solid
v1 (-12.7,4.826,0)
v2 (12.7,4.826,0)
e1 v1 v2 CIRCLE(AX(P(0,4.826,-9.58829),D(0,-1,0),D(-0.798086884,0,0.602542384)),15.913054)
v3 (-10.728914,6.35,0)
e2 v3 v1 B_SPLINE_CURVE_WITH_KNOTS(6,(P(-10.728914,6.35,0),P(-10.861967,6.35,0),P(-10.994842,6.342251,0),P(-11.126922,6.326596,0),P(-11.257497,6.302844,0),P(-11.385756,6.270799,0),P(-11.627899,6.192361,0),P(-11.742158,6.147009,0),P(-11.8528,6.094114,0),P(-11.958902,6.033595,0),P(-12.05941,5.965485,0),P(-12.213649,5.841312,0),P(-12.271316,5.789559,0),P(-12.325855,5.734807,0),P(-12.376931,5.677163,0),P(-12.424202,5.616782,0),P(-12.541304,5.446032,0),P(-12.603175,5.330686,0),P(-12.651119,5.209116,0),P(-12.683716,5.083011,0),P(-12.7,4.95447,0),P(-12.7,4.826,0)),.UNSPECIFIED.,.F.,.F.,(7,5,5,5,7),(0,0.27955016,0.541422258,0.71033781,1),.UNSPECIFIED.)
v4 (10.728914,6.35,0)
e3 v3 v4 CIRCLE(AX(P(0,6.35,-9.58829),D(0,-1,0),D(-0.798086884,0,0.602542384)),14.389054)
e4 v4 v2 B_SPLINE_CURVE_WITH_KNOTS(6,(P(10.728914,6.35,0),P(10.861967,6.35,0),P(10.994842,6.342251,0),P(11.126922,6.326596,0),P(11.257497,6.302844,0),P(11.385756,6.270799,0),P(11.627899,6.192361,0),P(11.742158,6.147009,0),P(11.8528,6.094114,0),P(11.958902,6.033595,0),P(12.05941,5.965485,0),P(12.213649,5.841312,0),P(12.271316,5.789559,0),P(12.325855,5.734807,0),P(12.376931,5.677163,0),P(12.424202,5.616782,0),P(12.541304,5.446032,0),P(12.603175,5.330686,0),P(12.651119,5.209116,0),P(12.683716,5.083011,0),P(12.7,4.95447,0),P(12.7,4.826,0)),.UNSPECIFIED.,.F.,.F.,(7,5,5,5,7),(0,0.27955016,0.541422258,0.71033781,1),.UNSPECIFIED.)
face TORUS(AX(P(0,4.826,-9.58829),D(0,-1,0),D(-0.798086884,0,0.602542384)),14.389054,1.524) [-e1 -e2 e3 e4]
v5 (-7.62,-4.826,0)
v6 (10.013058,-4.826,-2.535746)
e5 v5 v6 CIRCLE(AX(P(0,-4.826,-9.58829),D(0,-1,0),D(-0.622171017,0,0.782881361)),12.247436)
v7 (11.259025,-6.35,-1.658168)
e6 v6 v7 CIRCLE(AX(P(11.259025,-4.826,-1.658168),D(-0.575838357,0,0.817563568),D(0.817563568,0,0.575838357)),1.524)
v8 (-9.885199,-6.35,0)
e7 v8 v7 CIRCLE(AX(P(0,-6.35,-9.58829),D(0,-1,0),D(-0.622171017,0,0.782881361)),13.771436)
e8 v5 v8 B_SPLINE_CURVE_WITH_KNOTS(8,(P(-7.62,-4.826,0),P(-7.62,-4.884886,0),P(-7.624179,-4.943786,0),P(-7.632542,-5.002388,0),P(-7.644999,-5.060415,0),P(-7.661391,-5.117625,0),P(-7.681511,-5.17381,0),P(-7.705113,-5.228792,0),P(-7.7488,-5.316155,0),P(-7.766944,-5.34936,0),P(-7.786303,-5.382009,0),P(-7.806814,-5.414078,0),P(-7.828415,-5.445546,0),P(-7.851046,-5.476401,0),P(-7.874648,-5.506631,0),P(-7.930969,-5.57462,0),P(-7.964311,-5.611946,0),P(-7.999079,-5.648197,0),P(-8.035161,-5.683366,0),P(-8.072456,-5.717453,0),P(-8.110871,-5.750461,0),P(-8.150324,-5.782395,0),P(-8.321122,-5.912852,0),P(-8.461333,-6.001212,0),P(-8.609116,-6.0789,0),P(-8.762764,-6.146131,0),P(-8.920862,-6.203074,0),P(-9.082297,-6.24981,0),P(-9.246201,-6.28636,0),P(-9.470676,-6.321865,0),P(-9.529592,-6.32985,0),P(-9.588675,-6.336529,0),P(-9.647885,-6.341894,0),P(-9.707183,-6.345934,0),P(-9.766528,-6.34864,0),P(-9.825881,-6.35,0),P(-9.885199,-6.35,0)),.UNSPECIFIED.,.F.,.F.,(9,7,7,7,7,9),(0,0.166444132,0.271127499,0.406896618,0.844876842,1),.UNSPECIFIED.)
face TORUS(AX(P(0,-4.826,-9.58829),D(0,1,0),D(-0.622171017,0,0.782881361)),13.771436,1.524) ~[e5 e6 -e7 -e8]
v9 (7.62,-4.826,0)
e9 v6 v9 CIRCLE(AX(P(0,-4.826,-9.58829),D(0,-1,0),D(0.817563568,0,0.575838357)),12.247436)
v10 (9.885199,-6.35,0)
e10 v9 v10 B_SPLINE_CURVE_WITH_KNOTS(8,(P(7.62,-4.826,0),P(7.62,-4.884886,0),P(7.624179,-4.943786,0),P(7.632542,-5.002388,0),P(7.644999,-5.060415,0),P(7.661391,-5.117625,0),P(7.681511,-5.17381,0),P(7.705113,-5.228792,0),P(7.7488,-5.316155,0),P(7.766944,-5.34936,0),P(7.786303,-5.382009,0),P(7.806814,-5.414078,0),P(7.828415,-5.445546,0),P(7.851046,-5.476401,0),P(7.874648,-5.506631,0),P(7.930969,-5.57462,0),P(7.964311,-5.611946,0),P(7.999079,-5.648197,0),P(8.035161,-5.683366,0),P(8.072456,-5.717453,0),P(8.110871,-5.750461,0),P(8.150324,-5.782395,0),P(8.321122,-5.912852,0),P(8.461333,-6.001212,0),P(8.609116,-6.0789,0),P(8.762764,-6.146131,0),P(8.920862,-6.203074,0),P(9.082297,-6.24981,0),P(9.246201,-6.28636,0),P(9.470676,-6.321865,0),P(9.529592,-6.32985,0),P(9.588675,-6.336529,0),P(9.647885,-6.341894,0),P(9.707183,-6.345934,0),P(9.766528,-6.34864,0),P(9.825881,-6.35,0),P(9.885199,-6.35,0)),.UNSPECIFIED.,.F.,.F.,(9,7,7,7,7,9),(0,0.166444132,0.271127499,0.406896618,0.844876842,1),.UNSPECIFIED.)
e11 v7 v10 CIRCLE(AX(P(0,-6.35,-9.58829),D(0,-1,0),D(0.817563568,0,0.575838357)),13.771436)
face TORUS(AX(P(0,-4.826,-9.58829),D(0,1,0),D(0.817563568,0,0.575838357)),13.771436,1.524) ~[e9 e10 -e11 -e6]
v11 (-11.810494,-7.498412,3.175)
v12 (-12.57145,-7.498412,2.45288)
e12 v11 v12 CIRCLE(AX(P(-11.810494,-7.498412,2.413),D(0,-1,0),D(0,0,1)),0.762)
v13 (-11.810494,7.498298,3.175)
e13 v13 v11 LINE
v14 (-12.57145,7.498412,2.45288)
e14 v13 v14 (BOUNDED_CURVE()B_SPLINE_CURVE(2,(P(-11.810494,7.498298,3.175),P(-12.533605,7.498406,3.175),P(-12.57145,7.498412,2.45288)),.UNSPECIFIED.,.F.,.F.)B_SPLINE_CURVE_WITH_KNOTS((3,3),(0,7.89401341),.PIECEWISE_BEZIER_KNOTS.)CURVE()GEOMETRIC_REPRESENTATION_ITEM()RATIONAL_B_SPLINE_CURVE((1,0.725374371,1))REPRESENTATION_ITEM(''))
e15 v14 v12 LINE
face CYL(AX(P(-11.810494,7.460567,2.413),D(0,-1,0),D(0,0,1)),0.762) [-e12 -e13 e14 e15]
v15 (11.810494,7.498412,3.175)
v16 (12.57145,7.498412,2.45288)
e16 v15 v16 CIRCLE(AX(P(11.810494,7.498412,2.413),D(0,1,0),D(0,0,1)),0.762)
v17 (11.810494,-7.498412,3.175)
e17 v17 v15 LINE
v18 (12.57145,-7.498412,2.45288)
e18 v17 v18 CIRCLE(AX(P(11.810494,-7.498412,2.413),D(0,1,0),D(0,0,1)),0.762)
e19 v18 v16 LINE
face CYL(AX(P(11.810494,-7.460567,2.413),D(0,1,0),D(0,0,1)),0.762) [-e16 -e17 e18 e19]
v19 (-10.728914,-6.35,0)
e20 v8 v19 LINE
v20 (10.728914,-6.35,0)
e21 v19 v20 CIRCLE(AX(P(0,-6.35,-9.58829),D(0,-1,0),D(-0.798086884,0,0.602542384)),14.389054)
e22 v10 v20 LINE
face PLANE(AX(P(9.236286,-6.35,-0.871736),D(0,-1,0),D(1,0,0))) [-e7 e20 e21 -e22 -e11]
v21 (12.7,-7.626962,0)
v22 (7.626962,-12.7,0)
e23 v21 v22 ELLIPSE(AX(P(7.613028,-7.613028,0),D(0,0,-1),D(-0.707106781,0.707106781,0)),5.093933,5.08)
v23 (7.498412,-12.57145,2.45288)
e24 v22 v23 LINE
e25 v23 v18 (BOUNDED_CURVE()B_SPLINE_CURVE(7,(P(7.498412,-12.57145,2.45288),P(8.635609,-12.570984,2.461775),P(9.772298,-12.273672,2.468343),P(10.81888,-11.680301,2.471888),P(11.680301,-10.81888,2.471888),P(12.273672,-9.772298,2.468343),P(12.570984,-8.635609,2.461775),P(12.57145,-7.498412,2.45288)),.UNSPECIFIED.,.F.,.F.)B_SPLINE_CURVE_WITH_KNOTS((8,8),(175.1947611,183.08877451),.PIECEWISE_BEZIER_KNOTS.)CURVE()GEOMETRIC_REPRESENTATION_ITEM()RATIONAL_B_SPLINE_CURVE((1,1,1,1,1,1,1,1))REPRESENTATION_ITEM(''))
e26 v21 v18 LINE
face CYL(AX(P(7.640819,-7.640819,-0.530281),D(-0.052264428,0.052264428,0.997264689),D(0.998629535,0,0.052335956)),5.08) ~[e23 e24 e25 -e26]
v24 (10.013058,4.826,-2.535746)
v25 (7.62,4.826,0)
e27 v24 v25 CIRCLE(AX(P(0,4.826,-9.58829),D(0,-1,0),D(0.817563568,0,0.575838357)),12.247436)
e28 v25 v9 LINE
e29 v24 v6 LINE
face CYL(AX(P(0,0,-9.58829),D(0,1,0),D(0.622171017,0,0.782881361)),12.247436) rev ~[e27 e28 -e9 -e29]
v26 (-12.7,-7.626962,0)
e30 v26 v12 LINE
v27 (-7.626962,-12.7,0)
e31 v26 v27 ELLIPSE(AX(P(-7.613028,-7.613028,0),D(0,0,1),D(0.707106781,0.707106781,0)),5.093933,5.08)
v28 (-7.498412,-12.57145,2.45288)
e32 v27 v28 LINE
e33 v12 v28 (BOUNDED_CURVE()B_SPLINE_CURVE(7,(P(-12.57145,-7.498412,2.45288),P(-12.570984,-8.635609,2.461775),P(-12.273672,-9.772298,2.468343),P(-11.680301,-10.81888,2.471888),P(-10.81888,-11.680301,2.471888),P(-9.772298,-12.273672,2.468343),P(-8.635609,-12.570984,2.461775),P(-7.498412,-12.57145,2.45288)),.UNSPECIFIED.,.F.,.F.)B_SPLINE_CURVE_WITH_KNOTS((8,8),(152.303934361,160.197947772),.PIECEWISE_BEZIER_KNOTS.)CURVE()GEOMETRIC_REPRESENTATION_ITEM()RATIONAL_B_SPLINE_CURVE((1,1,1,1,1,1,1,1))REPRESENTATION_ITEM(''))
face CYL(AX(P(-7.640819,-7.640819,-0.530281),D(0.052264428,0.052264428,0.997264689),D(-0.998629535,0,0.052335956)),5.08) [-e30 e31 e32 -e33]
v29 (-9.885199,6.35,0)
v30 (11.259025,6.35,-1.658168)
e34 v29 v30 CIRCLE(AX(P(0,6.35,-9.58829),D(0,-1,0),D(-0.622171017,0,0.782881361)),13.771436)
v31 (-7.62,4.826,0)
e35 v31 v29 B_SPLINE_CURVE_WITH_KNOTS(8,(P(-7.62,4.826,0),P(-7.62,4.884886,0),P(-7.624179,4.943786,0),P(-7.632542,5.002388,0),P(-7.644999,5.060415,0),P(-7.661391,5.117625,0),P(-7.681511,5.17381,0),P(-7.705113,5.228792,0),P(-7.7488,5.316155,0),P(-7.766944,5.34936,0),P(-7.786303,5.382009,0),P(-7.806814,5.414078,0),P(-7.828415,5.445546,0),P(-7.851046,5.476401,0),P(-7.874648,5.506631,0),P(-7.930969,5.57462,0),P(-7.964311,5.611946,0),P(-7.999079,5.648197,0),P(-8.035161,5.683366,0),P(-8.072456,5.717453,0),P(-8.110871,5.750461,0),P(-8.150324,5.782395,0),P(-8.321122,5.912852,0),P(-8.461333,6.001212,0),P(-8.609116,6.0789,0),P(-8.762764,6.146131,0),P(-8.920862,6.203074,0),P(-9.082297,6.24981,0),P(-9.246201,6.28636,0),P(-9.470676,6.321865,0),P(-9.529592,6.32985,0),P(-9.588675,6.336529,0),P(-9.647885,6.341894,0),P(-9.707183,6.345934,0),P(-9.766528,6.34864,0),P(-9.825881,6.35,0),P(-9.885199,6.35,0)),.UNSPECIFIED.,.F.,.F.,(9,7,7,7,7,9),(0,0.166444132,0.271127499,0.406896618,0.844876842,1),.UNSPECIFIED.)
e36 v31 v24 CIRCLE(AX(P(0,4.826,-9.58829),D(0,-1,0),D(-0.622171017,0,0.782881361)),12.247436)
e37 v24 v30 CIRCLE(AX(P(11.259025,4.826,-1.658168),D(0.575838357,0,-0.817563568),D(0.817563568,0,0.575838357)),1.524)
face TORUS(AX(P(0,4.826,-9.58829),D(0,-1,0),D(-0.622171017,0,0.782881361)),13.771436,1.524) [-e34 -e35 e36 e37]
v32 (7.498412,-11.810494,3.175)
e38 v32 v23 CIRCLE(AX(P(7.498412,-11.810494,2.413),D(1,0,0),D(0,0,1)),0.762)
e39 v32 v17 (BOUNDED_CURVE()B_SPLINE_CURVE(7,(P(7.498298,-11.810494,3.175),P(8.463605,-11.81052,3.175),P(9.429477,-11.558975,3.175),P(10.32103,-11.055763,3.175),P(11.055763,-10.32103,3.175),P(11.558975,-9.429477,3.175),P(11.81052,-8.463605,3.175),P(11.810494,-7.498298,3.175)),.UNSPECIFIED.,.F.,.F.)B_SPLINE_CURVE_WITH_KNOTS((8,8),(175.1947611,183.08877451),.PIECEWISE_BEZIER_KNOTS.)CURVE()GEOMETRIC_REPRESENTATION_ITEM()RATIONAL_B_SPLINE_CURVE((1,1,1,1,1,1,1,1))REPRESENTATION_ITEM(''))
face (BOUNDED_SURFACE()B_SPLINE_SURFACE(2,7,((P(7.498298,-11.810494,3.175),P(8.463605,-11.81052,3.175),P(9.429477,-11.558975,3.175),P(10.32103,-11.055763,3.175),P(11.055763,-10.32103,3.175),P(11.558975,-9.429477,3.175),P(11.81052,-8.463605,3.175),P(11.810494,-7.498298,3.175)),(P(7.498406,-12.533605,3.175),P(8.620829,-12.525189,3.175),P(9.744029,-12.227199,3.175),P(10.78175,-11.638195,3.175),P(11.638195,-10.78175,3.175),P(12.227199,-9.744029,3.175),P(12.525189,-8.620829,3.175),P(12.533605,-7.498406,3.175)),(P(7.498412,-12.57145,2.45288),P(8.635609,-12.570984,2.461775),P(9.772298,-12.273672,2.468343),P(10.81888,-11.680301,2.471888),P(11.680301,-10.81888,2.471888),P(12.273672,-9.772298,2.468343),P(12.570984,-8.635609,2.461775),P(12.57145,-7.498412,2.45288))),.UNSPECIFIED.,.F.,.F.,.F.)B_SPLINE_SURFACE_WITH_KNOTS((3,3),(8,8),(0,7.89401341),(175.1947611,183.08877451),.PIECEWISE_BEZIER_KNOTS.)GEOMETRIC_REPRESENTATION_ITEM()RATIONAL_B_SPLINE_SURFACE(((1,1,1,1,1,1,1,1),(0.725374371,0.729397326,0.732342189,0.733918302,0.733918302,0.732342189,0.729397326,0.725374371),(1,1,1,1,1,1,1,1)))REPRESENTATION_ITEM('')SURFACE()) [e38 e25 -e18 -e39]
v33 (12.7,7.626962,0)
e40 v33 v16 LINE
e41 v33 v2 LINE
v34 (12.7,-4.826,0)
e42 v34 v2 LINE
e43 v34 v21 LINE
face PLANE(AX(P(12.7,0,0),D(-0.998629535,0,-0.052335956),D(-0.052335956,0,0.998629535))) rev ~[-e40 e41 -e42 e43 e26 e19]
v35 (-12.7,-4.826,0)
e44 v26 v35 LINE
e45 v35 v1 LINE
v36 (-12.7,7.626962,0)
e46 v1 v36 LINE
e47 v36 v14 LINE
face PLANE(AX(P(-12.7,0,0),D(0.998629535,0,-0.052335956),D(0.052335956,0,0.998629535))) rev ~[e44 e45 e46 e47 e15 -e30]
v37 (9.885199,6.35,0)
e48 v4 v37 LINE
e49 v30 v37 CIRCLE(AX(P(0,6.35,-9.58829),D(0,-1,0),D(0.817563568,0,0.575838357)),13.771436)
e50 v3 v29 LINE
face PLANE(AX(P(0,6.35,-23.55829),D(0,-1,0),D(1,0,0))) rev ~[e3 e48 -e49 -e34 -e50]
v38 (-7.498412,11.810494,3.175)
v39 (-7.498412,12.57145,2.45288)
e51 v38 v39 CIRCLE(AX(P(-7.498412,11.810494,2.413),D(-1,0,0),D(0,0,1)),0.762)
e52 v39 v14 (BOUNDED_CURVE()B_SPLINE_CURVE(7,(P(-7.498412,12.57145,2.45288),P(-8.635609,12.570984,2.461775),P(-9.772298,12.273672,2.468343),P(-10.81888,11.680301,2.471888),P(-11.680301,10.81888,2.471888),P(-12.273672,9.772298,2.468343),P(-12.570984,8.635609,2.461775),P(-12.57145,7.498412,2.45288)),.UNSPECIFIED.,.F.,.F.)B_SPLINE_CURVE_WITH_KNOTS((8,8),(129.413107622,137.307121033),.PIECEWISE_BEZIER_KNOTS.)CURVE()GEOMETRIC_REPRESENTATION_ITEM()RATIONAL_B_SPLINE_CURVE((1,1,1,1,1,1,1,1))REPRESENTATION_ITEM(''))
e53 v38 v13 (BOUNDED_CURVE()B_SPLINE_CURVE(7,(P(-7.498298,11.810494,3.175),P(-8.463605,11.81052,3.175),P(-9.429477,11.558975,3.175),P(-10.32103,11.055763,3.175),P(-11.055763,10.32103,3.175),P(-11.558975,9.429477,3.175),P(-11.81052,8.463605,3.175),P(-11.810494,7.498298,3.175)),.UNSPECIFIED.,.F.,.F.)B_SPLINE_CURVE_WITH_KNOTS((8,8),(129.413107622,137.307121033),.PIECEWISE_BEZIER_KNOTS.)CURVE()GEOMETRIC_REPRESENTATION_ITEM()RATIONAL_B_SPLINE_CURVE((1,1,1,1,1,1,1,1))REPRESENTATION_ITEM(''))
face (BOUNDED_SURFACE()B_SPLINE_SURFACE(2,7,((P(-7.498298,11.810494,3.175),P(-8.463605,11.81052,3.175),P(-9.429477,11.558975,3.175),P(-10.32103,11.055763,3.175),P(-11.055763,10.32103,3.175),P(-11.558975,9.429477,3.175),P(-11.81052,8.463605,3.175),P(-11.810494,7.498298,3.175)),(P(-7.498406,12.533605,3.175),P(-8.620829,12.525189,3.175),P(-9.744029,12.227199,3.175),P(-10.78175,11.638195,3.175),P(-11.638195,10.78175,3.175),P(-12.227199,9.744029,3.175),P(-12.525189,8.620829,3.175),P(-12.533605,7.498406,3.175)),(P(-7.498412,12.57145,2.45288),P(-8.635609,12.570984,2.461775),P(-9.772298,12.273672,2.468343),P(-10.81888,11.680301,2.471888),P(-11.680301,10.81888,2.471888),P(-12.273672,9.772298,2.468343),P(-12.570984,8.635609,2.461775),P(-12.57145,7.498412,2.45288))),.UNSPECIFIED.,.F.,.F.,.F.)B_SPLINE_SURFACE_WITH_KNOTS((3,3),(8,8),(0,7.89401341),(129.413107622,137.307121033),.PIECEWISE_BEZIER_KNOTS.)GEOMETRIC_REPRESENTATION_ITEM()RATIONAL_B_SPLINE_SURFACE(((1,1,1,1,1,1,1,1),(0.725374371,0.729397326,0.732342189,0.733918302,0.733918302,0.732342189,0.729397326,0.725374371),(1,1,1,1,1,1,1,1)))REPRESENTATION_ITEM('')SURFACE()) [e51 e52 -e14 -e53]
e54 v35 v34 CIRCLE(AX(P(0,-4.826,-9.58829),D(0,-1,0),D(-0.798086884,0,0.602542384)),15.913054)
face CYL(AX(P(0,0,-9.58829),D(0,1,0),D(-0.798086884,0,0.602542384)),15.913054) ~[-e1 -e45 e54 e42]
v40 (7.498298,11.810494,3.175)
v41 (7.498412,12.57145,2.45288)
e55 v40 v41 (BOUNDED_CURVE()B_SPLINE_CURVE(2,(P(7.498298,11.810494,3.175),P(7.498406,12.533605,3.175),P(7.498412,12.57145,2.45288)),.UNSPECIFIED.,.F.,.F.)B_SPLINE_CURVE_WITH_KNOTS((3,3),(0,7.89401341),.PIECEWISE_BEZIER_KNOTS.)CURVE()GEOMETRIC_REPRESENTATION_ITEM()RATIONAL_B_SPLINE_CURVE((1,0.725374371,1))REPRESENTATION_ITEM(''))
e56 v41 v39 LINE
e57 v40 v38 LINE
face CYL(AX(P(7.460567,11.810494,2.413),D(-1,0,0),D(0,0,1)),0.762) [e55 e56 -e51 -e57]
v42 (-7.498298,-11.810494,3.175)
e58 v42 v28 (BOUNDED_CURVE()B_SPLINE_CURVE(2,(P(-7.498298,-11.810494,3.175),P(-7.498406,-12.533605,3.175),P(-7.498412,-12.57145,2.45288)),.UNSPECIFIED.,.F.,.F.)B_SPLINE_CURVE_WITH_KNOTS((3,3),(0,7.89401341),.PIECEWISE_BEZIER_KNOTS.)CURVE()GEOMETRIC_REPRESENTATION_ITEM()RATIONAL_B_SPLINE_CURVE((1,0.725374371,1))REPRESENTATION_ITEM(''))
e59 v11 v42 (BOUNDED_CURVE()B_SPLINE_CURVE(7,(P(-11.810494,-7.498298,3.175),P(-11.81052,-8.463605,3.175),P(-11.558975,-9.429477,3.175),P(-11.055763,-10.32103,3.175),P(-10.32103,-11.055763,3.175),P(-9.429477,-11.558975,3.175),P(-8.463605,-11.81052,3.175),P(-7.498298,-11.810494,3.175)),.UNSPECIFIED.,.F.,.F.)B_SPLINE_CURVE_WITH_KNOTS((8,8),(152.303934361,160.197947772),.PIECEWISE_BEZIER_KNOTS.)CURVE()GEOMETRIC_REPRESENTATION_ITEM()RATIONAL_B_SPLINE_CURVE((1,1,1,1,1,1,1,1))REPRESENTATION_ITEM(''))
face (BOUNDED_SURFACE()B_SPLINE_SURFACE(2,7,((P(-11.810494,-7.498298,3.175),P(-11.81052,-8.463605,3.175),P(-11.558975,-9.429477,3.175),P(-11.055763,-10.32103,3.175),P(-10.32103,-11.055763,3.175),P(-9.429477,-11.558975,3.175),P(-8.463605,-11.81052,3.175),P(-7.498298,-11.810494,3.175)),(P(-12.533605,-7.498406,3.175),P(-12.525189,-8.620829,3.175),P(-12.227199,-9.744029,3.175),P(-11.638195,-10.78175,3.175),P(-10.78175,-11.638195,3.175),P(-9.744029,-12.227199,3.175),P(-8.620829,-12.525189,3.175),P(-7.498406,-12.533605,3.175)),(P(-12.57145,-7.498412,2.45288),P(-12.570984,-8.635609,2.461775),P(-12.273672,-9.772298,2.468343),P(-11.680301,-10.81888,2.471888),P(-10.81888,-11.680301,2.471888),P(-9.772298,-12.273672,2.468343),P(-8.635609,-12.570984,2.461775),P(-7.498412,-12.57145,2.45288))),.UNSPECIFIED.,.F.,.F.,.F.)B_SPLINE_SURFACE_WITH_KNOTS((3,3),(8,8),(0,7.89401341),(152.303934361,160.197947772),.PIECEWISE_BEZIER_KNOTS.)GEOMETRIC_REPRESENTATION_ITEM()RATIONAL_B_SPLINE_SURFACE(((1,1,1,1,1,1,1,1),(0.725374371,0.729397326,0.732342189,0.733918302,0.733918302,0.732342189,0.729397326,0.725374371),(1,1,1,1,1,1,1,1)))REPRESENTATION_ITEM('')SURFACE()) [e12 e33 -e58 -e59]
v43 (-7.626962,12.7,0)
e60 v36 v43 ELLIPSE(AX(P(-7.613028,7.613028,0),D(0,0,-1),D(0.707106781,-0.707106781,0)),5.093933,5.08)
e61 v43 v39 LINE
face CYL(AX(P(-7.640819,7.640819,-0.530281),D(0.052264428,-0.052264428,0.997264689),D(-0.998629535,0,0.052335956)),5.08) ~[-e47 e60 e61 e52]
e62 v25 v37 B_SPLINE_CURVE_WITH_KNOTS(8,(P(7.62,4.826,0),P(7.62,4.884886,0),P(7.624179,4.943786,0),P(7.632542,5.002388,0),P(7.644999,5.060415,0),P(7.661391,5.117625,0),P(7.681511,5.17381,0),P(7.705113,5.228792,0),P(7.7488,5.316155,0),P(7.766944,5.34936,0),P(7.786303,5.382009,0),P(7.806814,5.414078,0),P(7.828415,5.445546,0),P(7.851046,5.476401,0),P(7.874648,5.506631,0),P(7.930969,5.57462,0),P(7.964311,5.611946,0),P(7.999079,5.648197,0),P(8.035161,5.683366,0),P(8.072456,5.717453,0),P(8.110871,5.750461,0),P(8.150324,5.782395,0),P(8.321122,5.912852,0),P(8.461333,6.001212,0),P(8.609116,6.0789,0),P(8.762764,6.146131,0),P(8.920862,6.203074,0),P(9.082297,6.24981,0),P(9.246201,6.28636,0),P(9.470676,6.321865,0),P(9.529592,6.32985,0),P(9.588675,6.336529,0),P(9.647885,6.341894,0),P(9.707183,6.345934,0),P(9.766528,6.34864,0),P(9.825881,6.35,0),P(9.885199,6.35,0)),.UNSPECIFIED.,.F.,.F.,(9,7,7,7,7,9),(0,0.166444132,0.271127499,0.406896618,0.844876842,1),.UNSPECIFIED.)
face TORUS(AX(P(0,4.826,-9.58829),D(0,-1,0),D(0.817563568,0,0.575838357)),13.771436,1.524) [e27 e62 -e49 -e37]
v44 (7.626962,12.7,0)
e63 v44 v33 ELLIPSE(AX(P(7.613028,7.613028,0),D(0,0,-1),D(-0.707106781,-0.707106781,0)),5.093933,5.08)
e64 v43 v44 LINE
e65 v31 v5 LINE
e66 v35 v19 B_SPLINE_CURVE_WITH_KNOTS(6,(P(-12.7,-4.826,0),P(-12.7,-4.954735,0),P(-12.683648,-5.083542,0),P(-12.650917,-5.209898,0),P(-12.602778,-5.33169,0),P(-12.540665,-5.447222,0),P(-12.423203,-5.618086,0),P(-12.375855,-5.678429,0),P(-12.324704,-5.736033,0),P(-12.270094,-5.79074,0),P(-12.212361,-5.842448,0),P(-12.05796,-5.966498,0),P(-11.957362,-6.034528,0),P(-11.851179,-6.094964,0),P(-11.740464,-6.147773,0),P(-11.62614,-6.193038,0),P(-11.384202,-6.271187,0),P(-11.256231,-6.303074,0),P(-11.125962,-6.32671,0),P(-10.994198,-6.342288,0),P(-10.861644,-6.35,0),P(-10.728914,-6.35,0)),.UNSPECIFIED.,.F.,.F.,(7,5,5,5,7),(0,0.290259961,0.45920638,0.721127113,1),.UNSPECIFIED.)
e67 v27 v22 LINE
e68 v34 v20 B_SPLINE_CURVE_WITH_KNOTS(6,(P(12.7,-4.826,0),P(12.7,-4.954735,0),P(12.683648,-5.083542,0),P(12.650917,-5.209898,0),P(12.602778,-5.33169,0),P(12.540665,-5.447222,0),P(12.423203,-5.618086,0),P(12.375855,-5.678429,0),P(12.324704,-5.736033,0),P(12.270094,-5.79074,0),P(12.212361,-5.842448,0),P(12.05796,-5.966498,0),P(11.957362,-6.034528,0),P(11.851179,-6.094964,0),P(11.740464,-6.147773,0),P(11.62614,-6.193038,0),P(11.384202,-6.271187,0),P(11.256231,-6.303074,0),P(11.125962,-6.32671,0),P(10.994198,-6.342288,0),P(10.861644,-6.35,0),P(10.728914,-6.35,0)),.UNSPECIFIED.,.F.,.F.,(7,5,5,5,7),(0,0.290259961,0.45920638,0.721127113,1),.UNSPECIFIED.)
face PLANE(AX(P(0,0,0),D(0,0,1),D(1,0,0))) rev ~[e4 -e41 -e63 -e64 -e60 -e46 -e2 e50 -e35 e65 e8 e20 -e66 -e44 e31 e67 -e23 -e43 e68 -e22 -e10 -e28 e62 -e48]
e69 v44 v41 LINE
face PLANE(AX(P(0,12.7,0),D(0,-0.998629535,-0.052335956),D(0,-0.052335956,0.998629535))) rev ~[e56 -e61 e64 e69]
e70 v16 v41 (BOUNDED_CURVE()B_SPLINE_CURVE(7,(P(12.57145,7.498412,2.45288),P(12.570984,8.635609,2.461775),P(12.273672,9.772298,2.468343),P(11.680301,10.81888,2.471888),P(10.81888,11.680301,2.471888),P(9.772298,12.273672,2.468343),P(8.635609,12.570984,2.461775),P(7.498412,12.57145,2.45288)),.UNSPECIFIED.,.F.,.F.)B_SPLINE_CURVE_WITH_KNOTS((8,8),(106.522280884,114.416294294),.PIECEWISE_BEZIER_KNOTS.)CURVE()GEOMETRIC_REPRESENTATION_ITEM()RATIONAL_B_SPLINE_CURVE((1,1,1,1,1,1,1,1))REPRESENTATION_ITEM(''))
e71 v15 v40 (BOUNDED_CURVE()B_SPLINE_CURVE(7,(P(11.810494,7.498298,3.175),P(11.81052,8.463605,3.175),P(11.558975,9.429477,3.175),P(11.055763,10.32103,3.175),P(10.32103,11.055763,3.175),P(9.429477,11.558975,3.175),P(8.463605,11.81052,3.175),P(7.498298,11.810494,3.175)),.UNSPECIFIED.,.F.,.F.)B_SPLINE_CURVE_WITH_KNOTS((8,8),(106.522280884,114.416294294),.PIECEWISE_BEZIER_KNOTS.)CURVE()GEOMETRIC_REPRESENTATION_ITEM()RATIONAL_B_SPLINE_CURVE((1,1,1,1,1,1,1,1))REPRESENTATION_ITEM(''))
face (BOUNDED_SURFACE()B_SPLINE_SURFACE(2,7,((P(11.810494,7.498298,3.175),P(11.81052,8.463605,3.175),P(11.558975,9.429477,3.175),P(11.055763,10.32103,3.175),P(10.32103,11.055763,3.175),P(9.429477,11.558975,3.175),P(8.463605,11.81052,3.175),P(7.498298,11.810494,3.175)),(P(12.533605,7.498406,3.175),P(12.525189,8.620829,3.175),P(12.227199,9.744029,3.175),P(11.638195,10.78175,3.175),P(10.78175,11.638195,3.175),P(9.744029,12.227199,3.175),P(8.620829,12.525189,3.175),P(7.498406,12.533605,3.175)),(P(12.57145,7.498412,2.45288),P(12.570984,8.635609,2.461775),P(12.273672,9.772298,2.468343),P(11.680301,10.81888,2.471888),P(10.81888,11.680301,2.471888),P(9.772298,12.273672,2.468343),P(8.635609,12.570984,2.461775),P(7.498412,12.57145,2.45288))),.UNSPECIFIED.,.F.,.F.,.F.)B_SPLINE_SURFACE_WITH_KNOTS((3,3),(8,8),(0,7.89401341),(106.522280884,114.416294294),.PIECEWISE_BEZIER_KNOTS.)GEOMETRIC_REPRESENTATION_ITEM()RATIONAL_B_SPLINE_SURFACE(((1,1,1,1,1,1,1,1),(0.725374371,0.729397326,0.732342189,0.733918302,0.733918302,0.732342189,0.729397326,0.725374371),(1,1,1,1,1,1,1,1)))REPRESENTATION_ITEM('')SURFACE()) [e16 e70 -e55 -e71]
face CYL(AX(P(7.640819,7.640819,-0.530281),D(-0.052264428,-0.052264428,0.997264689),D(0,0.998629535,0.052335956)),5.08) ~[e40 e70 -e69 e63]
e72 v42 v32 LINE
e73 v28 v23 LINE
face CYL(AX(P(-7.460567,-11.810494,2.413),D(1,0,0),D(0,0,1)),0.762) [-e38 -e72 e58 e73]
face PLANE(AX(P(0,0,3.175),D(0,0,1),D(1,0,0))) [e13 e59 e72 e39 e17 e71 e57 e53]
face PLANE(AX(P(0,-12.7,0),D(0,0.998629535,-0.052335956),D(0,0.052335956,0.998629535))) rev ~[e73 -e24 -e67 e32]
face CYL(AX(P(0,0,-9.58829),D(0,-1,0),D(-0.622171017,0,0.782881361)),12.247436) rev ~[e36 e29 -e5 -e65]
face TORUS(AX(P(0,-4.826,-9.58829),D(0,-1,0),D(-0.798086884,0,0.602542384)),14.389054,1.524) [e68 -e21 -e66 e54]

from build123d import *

# Parameters (mm, degrees)
F0_W          = 25.4
F0_H          = 25.4
F1_DEPTH      = 3.175
F1_TAPER      = 3
F3_W          = 5.08
F3_H          = 12.7
F6_DEPTH      = 6.35
F6_DEPTH_BACK = 6.35
F7_R          = 5.08
F8_R          = 1.524
F9_R          = 0.762


with BuildPart() as f1:
    # F0 (on Top) → F1 (new body)
    with BuildSketch(Plane.XY):
        Rectangle(F0_W, F0_H)
    extrude(amount=F1_DEPTH, taper=F1_TAPER)

    # F4: sweep along a path in F2
    with BuildLine(Plane.XZ) as f4_path:
        ThreePointArc((-10.16, 0), (0, -23.5582897328), (10.16, 0))
    # F3 (on face) → F4 (sweep)
    with BuildSketch(Plane(origin=(0, 0, 0), x_dir=(1, 0, 0), z_dir=(0, 0, -1))):
        with Locations((-10.16, 0)):
            Rectangle(F3_W, F3_H)
    sweep(path=f4_path.line)

    # F5 (on Front) → F6 (join, two sides)
    with BuildSketch(Plane.XZ) as f6_sk:
        with BuildLine():
            Line((10.0130578512, -2.535746045), (10.16, 0))
            Line((10.16, 0), (7.62, 0))
            ThreePointArc((7.62, 0), (8.9072265211, -1.1822790439), (10.0130578512, -2.535746045))
        make_face()
    extrude(amount=F6_DEPTH)
    extrude(f6_sk.sketch, amount=-F6_DEPTH_BACK)

    # F7
    f7_edges = [f1.edges().sort_by_distance(p)[0] for p in [
        (-12.616803, -12.616803, 1.5875),
        (-12.616803, 12.616803, 1.5875),
        (12.616803, -12.616803, 1.5875),
        (12.616803, 12.616803, 1.5875),
    ]]
    fillet(f7_edges, radius=F7_R)

    # F8
    f8_edges = [f1.edges().sort_by_distance(p)[0] for p in [
        (-1.743325, -6.35, -21.711017),
        (8.907227, -6.35, -1.182279),
        (-1.743325, 6.35, -21.711017),
        (0, -6.35, -25.501344),
        (0, 6.35, -25.501344),
        (8.907227, 6.35, -1.182279),
    ]]
    fillet(f8_edges, radius=F8_R)

    # F9
    f9_edges = [f1.edges().sort_by_distance(p)[0] for p in [
        (12.533605, 0, 3.175),
        (11.048589, -11.048589, 3.175),
        (11.048589, 11.048589, 3.175),
        (0, -12.533605, 3.175),
        (0, 12.533605, 3.175),
        (-11.048589, -11.048589, 3.175),
        (-11.048589, 11.048589, 3.175),
        (-12.533605, 0, 3.175),
    ]]
    fillet(f9_edges, radius=F9_R)


solid = f1.part
